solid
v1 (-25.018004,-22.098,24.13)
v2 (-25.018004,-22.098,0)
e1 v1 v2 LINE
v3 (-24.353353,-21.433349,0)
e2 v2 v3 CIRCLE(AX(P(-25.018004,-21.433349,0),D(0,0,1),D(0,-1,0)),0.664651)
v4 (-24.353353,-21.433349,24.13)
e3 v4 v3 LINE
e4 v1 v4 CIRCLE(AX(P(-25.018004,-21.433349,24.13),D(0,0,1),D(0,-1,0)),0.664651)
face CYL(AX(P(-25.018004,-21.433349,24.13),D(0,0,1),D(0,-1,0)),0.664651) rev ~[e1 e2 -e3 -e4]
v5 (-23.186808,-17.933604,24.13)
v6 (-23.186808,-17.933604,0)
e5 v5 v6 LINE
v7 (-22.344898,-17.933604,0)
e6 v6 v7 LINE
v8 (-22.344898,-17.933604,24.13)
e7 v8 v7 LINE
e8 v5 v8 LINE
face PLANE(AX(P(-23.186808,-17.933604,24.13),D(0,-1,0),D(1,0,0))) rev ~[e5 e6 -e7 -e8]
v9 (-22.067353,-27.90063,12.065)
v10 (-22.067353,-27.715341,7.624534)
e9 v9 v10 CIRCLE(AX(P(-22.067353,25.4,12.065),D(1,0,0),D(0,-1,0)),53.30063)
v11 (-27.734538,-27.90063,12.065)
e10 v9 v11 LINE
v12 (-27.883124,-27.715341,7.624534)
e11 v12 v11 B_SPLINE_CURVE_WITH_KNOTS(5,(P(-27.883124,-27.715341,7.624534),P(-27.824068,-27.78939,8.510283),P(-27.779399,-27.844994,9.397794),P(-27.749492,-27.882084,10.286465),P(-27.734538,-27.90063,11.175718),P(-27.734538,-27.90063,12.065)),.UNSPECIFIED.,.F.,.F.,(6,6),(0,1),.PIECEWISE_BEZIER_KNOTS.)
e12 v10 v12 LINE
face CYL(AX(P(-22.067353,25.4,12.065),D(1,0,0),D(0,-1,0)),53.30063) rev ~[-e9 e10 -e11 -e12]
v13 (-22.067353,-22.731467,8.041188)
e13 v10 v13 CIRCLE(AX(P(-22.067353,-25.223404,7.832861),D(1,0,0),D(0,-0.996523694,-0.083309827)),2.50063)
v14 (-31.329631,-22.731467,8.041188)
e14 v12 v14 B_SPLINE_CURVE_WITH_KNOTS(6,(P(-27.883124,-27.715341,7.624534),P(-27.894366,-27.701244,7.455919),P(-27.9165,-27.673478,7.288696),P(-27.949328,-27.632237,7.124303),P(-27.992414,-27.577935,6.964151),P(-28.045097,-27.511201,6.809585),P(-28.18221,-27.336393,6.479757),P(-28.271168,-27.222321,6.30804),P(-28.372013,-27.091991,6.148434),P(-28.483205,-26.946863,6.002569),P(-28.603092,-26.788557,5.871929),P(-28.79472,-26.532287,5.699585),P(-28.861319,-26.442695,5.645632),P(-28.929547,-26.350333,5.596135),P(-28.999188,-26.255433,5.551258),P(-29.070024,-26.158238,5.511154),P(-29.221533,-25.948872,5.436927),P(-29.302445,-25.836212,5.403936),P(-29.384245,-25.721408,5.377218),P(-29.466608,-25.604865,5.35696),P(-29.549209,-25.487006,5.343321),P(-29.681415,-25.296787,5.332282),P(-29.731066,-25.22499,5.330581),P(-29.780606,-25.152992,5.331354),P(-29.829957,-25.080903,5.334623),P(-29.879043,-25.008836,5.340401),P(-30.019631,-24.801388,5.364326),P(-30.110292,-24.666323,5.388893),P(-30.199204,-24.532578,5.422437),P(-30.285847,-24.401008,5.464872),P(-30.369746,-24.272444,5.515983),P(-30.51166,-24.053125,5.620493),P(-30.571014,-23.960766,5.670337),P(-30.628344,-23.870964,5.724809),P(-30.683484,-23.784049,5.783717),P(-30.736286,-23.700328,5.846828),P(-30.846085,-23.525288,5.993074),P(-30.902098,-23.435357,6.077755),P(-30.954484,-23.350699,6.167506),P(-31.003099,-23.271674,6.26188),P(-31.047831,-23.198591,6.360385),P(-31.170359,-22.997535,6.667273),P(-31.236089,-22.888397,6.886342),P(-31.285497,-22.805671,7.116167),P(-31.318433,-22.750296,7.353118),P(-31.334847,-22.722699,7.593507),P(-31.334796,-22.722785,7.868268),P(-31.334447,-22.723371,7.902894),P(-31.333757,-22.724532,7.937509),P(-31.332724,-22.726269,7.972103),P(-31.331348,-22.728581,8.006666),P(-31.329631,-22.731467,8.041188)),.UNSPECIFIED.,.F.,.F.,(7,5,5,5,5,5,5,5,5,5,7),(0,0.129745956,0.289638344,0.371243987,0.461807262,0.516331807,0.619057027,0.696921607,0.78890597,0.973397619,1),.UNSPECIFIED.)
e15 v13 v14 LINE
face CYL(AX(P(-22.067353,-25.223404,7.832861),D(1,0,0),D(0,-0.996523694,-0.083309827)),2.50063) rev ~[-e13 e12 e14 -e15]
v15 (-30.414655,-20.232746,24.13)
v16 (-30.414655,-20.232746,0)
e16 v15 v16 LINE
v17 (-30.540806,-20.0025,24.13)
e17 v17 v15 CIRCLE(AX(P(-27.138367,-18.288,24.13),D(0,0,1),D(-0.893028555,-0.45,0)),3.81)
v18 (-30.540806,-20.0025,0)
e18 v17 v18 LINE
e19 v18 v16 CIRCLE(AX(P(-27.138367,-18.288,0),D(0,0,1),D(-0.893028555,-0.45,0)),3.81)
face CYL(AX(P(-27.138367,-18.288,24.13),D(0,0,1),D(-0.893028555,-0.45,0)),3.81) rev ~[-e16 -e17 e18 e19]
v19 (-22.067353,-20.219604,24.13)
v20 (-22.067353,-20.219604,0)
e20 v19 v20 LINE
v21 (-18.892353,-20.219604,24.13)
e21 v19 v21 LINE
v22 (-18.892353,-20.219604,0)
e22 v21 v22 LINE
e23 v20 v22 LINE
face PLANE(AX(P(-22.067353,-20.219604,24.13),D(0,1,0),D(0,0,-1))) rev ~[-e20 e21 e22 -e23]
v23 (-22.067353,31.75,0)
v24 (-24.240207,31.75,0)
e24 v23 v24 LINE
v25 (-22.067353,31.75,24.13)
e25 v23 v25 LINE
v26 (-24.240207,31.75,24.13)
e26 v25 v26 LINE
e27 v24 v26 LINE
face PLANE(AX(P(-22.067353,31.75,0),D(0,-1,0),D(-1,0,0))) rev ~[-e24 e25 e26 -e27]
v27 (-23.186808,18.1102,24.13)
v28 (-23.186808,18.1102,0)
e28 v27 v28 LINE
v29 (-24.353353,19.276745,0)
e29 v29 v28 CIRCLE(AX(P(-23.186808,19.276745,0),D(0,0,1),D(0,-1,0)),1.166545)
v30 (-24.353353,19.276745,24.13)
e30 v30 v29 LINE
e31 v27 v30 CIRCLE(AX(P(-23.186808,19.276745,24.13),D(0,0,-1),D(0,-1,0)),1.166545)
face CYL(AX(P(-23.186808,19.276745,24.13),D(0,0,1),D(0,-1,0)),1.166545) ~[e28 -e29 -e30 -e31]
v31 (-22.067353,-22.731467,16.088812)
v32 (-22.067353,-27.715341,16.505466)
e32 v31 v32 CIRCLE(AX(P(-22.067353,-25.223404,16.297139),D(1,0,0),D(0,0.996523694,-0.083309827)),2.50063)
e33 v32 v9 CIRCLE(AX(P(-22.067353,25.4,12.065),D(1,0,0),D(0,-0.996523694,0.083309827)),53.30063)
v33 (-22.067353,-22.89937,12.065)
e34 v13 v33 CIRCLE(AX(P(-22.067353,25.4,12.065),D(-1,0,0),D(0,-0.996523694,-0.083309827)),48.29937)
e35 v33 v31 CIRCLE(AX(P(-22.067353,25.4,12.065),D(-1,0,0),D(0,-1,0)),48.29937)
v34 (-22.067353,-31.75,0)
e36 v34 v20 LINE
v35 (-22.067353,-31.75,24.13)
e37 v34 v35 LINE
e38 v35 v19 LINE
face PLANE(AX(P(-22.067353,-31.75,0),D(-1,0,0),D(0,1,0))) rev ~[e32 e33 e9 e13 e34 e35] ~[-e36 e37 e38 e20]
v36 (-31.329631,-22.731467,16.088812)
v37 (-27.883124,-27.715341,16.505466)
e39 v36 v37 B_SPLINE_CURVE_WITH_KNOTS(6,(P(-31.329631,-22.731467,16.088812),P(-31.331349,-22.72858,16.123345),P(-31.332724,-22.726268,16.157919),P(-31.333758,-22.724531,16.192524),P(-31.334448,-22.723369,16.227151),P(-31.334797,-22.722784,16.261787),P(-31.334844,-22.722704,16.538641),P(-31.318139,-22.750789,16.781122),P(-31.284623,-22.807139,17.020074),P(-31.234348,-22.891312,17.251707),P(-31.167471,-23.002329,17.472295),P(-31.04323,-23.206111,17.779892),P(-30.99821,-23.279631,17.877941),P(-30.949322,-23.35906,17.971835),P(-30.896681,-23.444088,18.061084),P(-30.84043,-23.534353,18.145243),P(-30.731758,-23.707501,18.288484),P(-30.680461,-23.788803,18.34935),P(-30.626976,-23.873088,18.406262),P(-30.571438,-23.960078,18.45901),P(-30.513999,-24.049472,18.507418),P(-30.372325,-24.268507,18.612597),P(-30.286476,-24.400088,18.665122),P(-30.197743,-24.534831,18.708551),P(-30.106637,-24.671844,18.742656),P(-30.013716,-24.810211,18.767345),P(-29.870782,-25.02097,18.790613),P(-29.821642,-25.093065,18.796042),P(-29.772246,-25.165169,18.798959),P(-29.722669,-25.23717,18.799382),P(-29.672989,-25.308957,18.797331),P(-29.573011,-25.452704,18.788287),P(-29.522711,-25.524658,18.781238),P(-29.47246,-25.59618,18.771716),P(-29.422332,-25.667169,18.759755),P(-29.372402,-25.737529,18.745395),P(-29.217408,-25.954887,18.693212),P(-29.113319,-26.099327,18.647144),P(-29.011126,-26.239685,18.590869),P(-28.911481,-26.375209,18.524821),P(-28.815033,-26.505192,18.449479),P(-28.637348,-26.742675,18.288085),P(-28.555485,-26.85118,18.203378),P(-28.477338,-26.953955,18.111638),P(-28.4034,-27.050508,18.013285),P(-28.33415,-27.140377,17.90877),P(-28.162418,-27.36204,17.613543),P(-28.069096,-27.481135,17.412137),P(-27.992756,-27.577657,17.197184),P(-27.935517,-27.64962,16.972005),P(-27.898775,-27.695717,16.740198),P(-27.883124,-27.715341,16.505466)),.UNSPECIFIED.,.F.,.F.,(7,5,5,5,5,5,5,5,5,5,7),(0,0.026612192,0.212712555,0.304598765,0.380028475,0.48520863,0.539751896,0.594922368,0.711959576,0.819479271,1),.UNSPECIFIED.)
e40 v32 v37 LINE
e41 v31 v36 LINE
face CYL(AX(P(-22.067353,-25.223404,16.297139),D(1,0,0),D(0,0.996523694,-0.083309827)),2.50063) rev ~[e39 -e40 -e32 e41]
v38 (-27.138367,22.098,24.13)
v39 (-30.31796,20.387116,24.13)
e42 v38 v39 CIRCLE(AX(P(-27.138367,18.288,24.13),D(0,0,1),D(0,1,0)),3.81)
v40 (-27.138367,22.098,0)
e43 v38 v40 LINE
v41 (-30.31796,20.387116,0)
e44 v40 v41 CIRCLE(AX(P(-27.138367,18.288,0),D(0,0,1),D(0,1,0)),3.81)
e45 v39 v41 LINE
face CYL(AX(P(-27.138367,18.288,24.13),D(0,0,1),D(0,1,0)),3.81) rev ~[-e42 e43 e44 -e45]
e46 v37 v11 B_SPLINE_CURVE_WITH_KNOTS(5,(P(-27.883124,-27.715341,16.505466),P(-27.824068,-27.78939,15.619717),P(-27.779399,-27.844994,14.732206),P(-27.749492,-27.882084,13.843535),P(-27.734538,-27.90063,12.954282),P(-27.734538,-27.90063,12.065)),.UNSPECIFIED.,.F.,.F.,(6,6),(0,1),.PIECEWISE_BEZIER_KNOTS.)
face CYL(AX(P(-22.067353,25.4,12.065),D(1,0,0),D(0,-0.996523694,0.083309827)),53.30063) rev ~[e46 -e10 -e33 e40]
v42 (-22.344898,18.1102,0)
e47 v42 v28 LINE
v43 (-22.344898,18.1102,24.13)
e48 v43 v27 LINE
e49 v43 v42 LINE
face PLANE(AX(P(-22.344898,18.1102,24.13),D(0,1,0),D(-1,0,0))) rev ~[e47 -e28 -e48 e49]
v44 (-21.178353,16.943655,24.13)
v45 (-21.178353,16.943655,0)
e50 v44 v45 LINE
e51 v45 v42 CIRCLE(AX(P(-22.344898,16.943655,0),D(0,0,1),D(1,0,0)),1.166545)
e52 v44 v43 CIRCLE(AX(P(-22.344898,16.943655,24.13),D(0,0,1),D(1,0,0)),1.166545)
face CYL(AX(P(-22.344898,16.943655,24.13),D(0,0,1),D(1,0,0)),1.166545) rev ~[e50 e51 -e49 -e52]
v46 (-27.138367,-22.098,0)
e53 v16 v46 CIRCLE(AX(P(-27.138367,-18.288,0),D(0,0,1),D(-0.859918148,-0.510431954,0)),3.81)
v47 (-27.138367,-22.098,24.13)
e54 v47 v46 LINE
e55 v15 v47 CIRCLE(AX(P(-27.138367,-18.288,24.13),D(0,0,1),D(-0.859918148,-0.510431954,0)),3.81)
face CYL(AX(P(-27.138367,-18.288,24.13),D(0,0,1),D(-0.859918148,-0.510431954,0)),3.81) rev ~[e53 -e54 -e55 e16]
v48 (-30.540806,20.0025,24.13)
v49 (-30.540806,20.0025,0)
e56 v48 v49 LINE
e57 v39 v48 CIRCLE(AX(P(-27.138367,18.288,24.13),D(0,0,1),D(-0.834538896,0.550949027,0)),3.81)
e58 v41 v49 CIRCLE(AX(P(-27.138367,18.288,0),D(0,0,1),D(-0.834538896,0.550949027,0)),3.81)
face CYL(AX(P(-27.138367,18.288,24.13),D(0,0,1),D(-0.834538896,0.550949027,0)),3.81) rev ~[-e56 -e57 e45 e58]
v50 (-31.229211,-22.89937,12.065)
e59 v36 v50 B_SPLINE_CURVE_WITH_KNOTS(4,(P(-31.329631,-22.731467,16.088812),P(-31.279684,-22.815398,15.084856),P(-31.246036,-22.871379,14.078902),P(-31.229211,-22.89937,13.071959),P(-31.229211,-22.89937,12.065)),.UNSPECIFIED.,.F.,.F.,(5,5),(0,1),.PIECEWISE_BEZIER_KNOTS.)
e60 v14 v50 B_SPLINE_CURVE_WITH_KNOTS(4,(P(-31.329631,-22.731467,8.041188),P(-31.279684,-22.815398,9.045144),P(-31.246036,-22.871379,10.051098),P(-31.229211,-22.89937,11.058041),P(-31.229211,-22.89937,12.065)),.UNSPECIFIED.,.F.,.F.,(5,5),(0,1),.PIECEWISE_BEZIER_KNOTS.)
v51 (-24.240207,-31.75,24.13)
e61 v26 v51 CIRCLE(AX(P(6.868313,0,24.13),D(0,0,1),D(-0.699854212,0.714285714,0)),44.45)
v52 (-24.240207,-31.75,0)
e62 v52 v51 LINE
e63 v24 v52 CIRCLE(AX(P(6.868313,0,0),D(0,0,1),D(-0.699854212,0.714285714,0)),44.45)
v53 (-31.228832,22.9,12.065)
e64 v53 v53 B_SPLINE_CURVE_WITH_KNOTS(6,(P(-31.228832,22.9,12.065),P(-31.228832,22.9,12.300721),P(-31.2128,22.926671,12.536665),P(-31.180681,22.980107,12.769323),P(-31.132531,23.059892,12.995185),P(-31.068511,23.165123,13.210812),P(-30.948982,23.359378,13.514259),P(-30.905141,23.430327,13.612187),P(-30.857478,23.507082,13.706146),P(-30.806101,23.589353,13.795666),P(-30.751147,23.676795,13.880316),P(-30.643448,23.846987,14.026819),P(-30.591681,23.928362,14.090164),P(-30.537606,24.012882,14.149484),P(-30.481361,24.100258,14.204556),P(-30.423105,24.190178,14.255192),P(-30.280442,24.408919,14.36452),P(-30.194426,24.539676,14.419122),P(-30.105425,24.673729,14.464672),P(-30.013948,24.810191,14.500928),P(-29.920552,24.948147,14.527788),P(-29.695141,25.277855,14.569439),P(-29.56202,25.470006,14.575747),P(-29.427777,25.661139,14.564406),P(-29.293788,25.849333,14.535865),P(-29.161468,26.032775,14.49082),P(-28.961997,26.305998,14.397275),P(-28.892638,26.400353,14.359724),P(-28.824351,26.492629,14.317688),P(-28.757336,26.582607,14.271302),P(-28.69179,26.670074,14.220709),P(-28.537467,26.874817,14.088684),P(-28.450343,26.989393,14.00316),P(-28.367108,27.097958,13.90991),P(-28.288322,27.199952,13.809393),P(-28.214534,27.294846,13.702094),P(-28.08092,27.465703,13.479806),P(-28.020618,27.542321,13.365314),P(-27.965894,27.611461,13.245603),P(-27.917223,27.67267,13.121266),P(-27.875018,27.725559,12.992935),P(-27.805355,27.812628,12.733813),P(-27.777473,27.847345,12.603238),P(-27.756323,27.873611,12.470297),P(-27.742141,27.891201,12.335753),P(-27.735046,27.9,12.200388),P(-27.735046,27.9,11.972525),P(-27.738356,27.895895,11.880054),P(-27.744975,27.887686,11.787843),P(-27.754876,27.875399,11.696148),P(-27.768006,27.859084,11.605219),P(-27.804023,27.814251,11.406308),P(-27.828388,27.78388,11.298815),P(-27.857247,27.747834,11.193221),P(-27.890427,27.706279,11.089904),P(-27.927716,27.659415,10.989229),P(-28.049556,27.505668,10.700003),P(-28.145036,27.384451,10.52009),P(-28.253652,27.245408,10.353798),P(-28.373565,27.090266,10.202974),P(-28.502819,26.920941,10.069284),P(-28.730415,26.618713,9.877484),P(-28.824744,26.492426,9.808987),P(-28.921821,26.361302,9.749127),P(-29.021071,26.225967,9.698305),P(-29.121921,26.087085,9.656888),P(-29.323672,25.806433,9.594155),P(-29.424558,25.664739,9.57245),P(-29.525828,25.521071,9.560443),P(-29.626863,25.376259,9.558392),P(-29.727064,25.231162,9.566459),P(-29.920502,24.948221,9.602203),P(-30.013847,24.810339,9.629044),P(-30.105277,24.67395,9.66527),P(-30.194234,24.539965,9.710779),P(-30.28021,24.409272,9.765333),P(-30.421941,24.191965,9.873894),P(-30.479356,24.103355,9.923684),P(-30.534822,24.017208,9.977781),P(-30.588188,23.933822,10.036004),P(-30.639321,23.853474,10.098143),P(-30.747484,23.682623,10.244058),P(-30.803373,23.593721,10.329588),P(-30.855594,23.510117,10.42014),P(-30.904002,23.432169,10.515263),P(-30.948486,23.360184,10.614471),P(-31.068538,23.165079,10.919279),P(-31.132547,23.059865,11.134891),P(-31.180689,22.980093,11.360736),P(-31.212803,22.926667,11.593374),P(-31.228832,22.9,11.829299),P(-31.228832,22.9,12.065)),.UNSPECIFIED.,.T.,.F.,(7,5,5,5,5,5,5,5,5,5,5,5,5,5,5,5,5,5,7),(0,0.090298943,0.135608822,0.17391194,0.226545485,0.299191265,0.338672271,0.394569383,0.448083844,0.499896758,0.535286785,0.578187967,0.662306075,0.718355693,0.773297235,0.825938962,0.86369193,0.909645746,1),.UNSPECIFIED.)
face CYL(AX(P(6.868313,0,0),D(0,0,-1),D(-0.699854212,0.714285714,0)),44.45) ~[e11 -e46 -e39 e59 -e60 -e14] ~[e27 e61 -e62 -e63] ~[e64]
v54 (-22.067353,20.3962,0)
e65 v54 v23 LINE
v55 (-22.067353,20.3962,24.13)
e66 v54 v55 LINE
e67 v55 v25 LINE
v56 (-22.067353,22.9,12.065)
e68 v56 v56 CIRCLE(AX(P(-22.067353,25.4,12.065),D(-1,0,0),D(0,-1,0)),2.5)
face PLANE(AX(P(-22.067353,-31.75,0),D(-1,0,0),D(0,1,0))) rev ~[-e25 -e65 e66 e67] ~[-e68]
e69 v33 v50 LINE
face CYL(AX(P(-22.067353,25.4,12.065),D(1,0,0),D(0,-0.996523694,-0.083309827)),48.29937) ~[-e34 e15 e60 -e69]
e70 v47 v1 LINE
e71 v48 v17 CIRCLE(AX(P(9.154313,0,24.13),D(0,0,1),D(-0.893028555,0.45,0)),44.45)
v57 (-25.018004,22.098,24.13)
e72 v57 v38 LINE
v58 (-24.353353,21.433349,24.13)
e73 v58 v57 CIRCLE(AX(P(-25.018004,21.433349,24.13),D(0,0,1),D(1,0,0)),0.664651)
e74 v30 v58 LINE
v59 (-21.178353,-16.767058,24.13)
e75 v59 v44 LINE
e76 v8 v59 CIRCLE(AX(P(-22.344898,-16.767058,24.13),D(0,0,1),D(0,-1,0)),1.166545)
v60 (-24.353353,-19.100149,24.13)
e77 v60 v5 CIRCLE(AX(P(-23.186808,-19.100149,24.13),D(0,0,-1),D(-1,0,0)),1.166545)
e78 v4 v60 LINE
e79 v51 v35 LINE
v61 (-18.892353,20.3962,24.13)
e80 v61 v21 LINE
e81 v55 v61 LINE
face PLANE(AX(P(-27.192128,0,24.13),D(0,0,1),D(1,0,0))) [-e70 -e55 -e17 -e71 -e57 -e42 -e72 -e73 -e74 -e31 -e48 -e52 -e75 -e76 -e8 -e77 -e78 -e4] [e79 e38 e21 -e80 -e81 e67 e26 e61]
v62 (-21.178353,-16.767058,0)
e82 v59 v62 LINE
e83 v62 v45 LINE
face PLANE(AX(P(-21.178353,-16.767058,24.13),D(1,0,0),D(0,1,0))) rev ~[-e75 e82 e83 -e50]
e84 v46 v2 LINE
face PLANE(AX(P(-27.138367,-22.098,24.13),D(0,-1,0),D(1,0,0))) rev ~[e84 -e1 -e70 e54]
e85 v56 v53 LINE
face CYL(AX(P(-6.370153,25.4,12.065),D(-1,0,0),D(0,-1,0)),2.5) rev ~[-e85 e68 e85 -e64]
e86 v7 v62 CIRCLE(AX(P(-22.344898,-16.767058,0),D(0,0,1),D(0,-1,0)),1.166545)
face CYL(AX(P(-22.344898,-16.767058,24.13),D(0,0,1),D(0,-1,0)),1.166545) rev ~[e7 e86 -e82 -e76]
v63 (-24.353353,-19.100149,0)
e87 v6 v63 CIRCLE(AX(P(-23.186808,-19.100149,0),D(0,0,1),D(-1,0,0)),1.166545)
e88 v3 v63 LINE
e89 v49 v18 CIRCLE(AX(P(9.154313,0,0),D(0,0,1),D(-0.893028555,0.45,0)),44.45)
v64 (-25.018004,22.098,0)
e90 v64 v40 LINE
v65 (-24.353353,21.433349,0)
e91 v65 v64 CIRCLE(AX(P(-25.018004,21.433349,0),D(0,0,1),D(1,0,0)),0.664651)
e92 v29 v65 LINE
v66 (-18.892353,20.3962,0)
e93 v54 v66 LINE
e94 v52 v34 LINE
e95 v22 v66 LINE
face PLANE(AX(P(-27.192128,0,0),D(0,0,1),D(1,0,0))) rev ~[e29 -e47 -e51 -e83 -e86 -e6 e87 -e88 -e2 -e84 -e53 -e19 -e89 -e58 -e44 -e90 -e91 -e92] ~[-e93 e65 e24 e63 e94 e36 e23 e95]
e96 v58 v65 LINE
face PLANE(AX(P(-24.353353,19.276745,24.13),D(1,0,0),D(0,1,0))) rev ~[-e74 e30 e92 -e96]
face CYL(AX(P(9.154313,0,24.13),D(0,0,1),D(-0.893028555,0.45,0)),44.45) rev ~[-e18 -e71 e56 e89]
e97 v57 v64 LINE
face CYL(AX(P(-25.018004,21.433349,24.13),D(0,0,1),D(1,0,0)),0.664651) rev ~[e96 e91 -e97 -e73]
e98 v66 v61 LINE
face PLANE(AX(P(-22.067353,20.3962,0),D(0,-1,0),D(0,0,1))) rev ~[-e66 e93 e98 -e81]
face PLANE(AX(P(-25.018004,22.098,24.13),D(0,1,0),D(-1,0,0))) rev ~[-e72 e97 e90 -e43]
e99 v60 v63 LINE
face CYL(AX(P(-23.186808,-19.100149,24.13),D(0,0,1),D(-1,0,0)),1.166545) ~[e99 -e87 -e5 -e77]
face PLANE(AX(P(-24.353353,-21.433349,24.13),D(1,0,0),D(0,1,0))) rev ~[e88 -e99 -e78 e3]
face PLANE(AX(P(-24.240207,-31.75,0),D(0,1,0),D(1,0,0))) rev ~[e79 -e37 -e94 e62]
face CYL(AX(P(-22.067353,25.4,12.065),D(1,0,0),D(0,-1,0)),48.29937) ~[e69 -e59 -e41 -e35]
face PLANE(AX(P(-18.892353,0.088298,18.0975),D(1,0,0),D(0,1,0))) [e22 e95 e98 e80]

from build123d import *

# Parameters (mm, degrees)
F1_DEPTH = 24.13
F3_DEPTH = 25.4
F4_D     = 5
F4_DEPTH = 15.6972
F4_TIP   = 1.5021515476
F6_DEPTH = 3.175
F9_DEPTH = 25.4


# Not quite as in the source:
# - a feature names something its author has since deleted; it is built from what else it names


with BuildPart() as f1:
    # F0 (on Top) → F1 (new body)
    with BuildSketch(Plane.XY):
        with BuildLine():
            Line((-22.0673531294, -31.75), (-22.0673531294, 31.75))
            Line((-22.0673531294, 31.75), (-24.2402065279, 31.75))
            ThreePointArc((-24.2402065279, 31.75), (-37.5816867945, 0), (-24.2402065279, -31.75))
            Line((-24.2402065279, -31.75), (-22.0673531294, -31.75))
        make_face()
    extrude(amount=F1_DEPTH)

    # F2 (on face) → F3 (cut)
    with BuildSketch(Plane.YZ.offset(-22.0673531294)):
        with BuildLine():
            ThreePointArc((-27.7153407028, 16.5054662391), (-27.8542875294, 14.287165191), (-27.90063, 12.065))
            Line((-27.90063, 12.065), (-22.89937, 12.065))
            ThreePointArc((-22.89937, 12.065), (-22.8573758972, 14.078656851), (-22.7314666127, 16.0888121361))
            ThreePointArc((-22.7314666127, 16.0888121361), (-25.0150766063, 18.7890762326), (-27.7153407028, 16.5054662391))
        make_face()
        with BuildLine():
            Line((-22.89937, 12.065), (-27.90063, 12.065))
            ThreePointArc((-27.90063, 12.065), (-27.8542875294, 9.842834809), (-27.7153407028, 7.6245337609))
            ThreePointArc((-27.7153407028, 7.6245337609), (-25.0150766063, 5.3409237674), (-22.7314666127, 8.0411878639))
            ThreePointArc((-22.7314666127, 8.0411878639), (-22.8573758972, 10.051343149), (-22.89937, 12.065))
        make_face()
    extrude(amount=-F3_DEPTH, mode=Mode.SUBTRACT)

    # F4
    with Locations(Plane.YZ.offset(-22.0673531294)):
        with Locations((25.4, 12.065)):
            Hole(F4_D / 2, depth=F4_DEPTH)
            with Locations((0, 0, -(F4_DEPTH + F4_TIP / 2))):  # 118° drill point
                Cone(0, F4_D / 2, F4_TIP, mode=Mode.SUBTRACT)

    # F5 (on face) → F6 (join)
    with BuildSketch(Plane.YZ.offset(-22.0673531294)):
        Polygon((18.8468, 24.13), (-20.2196036578, 24.13), (-20.2196036578, 12.065), (20.3962, 12.065), (20.3962, 24.13), align=None)
        Polygon((20.3962, 12.065), (-20.2196036578, 12.065), (-20.2196036578, 0), (18.8468, 0), (20.3962, 0), align=None)
    extrude(amount=F6_DEPTH)

    # F8 (on offset) → F9 (cut)
    with BuildSketch(Plane.XY.offset(24.13)):
        with BuildLine():
            Line((-27.1383672688, -22.098), (-25.0180043274, -22.098))
            ThreePointArc((-25.0180043274, -22.098), (-24.5480249582, -21.9033281712), (-24.3533531294, -21.433348802))
            Line((-24.3533531294, -21.433348802), (-24.3533531294, -19.1001488633))
            ThreePointArc((-24.3533531294, -19.1001488633), (-24.0116799492, -18.2752768379), (-23.1868079238, -17.9336036578))
            Line((-23.1868079238, -17.9336036578), (-22.344898335, -17.9336036578))
            ThreePointArc((-22.344898335, -17.9336036578), (-21.5200263095, -17.5919304776), (-21.1783531294, -16.7670584522))
            Line((-21.1783531294, -16.7670584522), (-21.1783531294, 16.9436547944))
            ThreePointArc((-21.1783531294, 16.9436547944), (-21.5200263095, 17.7685268198), (-22.344898335, 18.1102))
            Line((-22.344898335, 18.1102), (-23.1868079238, 18.1102))
            ThreePointArc((-23.1868079238, 18.1102), (-24.0116799492, 18.4518731802), (-24.3533531294, 19.2767452056))
            Line((-24.3533531294, 19.2767452056), (-24.3533531294, 21.4333486842))
            ThreePointArc((-24.3533531294, 21.4333486842), (-24.5480249927, 21.9033281367), (-25.0180044452, 22.098))
            Line((-25.0180044452, 22.098), (-27.1383672685, 22.098))
            ThreePointArc((-27.1383672685, 22.098), (-28.9437022551, 21.6431252713), (-30.3179604636, 20.3871157933))
            ThreePointArc((-30.3179604636, 20.3871157933), (-30.4349971545, 20.1980605736), (-30.540806063, 20.0025))
            ThreePointArc((-30.540806063, 20.0025), (-35.2956867945, 0), (-30.5408060633, -20.0025))
            ThreePointArc((-30.5408060633, -20.0025), (-30.4797145494, -20.1187097942), (-30.414655411, -20.2327457441))
            ThreePointArc((-30.414655411, -20.2327457441), (-29.0233896447, -21.5990105168), (-27.1383672688, -22.098))
        make_face()
    extrude(amount=-F9_DEPTH, mode=Mode.SUBTRACT)


solid = f1.part
